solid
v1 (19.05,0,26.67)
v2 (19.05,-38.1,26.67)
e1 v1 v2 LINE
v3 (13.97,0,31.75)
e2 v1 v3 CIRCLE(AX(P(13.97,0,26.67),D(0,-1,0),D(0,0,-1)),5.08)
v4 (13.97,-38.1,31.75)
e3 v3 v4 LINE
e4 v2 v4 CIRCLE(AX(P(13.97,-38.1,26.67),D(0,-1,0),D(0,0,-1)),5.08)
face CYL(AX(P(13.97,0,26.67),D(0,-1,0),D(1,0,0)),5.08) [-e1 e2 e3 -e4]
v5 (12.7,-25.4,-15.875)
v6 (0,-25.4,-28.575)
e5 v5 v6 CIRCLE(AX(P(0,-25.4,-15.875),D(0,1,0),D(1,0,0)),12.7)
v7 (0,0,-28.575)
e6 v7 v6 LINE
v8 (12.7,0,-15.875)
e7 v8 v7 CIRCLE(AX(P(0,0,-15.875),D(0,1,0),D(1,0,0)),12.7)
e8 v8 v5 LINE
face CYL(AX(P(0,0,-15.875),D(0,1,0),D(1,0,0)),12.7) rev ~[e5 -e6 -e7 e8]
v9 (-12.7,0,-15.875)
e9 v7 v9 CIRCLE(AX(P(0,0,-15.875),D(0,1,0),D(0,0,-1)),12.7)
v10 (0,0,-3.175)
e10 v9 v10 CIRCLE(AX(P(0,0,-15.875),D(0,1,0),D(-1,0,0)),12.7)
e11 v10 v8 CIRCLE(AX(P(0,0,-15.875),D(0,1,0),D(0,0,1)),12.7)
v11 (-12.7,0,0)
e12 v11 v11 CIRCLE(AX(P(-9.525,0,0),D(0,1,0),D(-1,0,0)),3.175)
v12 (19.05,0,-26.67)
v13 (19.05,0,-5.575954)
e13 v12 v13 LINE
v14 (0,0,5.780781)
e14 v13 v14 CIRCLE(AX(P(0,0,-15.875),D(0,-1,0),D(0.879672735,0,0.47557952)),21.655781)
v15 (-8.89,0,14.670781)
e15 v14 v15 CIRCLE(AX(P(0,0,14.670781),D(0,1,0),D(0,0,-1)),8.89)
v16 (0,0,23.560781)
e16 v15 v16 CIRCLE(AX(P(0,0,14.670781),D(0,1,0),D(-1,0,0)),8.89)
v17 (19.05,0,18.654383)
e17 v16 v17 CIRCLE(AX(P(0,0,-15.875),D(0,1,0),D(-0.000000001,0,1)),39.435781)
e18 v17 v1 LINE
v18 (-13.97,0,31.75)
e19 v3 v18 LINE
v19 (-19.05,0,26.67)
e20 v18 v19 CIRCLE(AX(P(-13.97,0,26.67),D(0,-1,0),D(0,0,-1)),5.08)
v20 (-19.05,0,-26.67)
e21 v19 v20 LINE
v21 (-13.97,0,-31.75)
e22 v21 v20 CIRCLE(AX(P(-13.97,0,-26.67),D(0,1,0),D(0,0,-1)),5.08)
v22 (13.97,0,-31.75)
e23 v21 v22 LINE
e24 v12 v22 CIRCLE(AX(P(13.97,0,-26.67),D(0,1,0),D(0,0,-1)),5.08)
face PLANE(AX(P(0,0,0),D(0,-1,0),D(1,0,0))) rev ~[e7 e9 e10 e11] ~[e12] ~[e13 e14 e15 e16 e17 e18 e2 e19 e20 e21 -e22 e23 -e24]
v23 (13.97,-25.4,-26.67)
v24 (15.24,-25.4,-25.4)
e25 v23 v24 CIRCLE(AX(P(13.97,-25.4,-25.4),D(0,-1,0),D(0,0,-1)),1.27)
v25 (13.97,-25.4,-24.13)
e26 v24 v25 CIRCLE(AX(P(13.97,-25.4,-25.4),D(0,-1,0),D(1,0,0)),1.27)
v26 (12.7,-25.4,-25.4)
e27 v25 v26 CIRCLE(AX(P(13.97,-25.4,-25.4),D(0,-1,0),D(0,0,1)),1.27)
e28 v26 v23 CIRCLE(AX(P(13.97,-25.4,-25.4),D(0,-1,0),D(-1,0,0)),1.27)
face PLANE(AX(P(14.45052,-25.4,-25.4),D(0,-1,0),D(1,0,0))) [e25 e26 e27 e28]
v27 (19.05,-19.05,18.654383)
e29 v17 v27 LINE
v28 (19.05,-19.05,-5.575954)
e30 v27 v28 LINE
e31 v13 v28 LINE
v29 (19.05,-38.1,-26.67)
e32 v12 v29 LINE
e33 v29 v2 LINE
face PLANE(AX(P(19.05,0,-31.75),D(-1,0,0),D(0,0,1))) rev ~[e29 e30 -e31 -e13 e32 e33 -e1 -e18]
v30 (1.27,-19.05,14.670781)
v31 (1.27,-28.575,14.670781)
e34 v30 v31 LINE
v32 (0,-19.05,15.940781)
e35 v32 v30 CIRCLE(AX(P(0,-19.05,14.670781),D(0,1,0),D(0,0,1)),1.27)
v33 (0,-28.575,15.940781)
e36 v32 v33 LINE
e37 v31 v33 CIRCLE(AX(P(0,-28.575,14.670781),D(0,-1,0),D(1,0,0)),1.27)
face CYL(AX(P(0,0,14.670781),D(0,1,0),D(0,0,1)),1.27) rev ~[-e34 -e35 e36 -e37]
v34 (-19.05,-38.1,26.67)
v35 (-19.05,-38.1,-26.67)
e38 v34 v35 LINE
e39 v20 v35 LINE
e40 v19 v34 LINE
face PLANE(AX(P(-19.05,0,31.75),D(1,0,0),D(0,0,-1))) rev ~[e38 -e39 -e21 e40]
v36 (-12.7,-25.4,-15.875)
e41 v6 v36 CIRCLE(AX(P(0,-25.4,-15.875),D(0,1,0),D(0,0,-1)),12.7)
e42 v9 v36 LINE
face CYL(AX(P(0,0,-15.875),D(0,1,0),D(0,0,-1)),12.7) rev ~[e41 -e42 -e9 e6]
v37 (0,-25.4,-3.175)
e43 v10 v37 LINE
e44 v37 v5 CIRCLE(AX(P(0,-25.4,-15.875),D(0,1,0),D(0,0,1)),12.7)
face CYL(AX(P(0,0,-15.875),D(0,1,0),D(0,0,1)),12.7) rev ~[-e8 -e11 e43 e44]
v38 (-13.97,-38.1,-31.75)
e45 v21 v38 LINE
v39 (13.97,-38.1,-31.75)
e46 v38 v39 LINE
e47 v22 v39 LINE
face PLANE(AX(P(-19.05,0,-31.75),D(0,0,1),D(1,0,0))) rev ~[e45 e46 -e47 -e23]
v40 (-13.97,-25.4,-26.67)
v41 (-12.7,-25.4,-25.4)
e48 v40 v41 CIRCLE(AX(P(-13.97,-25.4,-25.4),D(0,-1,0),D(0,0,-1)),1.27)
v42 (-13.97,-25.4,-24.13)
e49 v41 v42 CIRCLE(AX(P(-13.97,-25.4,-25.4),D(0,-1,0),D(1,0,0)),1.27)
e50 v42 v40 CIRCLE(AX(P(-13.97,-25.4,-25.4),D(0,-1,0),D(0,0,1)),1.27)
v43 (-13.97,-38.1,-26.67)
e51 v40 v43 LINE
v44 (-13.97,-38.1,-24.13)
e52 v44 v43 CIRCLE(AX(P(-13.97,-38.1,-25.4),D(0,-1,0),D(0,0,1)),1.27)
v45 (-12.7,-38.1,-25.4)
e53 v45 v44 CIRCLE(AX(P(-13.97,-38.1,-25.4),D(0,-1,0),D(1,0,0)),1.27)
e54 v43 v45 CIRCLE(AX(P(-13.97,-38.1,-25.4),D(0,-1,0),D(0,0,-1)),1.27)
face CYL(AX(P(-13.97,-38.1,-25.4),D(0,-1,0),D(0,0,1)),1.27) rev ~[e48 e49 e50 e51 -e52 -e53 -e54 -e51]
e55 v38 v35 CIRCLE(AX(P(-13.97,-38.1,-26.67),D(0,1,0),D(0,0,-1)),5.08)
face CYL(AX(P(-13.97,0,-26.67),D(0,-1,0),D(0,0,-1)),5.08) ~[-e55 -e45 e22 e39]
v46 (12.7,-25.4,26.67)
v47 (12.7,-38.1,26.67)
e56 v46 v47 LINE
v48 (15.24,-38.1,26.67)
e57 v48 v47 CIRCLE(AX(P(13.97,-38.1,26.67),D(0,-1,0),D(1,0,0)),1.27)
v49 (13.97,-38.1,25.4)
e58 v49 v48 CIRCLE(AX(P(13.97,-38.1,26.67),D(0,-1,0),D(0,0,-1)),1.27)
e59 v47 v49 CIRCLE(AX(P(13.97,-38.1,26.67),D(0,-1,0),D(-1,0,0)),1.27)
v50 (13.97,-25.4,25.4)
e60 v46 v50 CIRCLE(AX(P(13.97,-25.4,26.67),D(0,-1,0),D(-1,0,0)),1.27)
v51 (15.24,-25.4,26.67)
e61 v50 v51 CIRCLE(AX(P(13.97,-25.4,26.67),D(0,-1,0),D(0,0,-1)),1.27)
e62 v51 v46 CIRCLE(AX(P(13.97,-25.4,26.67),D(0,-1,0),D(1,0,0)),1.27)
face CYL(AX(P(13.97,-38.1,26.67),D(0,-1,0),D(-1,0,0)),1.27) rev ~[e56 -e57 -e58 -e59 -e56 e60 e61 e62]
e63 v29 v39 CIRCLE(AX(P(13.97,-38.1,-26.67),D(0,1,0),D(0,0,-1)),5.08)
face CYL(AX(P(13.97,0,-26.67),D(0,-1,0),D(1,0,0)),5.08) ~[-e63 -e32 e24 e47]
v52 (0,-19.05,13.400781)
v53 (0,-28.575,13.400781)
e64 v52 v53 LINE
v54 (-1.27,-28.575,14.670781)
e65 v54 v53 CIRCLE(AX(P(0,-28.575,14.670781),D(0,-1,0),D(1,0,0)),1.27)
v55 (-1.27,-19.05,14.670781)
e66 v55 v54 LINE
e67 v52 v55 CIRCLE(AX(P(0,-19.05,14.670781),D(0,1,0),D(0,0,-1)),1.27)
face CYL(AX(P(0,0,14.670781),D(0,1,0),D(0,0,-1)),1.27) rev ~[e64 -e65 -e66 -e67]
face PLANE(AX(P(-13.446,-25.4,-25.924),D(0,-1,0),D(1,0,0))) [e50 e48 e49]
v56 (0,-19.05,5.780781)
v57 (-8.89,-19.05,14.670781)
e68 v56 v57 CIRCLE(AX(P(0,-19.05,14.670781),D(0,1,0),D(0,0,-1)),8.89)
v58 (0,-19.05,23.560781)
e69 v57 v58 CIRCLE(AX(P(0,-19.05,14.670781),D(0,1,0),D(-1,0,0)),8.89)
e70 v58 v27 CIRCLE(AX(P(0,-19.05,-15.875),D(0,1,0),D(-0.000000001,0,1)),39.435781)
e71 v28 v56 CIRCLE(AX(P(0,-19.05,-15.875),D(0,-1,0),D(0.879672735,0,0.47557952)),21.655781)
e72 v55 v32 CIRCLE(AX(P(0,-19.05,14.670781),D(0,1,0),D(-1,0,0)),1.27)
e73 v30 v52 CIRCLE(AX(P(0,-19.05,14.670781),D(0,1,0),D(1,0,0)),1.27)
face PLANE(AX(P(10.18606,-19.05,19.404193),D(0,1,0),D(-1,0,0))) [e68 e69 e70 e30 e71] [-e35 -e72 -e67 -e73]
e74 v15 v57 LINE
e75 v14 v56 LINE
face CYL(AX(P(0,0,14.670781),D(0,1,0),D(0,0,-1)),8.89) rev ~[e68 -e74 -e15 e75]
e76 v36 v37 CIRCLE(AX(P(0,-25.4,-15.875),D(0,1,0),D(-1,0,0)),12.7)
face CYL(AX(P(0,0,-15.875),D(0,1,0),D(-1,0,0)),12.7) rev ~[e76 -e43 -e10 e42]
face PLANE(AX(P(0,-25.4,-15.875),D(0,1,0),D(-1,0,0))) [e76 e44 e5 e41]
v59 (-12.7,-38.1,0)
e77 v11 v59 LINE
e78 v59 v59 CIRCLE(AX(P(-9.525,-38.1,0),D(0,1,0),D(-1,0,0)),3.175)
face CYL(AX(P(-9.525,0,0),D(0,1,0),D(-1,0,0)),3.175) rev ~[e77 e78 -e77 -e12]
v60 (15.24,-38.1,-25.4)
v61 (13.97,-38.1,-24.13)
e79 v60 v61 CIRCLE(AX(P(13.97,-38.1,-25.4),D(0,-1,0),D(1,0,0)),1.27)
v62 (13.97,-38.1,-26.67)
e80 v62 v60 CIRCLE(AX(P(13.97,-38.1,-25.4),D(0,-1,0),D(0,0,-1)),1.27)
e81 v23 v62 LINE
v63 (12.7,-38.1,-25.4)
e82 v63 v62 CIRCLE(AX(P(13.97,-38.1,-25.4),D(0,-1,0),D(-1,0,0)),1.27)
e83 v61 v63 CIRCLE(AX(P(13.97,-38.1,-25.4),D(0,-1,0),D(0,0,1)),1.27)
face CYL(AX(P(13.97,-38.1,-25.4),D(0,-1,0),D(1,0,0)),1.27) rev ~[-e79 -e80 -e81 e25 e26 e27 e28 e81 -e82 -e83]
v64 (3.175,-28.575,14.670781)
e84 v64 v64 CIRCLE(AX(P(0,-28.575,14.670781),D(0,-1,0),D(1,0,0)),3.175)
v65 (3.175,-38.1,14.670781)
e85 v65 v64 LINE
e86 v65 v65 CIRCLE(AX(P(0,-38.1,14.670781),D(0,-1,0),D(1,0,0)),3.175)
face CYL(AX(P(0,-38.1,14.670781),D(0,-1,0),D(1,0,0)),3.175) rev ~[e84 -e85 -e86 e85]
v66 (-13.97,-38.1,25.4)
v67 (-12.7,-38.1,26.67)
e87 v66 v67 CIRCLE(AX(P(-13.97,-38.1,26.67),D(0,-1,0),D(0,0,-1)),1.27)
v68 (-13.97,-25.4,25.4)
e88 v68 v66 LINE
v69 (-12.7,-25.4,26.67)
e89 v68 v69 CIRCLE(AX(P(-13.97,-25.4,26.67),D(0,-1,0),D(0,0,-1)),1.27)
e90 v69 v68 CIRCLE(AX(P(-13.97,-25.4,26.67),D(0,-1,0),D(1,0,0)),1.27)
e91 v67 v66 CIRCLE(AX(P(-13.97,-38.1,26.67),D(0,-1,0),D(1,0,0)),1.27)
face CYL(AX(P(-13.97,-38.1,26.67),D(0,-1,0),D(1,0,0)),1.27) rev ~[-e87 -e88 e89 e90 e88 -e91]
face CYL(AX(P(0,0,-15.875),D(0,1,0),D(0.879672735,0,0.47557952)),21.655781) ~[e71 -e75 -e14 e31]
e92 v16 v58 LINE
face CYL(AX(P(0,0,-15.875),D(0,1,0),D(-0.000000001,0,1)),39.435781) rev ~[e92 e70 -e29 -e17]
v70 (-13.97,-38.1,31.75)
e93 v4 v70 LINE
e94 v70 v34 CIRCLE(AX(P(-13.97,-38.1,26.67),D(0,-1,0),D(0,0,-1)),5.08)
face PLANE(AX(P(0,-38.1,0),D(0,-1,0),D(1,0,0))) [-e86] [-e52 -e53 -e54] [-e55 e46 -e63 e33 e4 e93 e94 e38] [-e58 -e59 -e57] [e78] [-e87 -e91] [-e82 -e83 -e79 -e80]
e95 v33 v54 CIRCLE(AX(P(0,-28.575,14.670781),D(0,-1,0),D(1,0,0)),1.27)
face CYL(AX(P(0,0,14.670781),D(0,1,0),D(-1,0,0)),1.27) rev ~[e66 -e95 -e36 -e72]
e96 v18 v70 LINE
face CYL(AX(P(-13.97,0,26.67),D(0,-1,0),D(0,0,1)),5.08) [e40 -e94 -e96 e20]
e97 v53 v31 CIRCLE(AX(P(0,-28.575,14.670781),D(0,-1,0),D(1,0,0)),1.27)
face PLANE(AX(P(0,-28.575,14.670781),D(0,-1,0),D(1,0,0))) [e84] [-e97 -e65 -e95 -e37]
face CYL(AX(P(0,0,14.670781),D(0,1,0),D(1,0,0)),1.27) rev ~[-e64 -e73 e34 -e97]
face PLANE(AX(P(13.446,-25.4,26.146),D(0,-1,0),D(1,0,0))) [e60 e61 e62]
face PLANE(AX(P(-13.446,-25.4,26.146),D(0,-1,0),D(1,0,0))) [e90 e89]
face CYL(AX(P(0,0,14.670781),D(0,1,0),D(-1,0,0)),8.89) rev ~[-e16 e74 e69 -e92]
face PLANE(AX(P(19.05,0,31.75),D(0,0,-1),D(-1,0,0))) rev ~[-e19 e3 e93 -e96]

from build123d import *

# Parameters (mm, degrees)
F1_DEPTH = 38.1
F3_DEPTH = 19.05
F4_DEPTH = 38.1
F5_DEPTH = 25.4
F6_R     = 5.08
F7_R     = 3.175
F7_R_2   = 1.27
F8_DEPTH = 9.525
F9_DEPTH = 12.7
F10_R    = 5.08


# Not quite as in the source:
# - a feature names something its author has since deleted; it is built from what else it names


with BuildPart() as f1:
    # F0 (on Front) → F1 (new body)
    with BuildSketch(Plane.XZ):
        Polygon((19.05, -31.75), (19.05, 31.75), (-19.05, 31.75), (-19.05, 0), (-19.05, -31.75), align=None)
        with BuildLine():
            ThreePointArc((-6.35, 0), (-9.525, -3.175), (-12.7, 0))
            ThreePointArc((-12.7, 0), (-9.525, 3.175), (-6.35, 0))
        make_face(mode=Mode.SUBTRACT)
    extrude(amount=F1_DEPTH)

    # F2 (on face) → F3 (cut)
    with BuildSketch(Plane(origin=(0, 0, 0), x_dir=(-1, 0, 0), z_dir=(0, 1, 0))):
        with BuildLine():
            ThreePointArc((-8.89, 14.6707808959), (-6.2861792775, 20.956960188), (2.06e-08, 23.5607808959))
            ThreePointArc((2.06e-08, 23.5607808959), (-9.8358430758, 22.3144881592), (-19.05, 18.654383355))
            Line((-19.05, 18.654383355), (-19.05, 14.6707808959))
            Line((-19.05, 14.6707808959), (-8.89, 14.6707808959))
        make_face()
        with BuildLine():
            ThreePointArc((1.27, 14.6707808959), (0.8980256121, 15.5688065081), (0, 15.9407808959))
            Line((0, 15.9407808959), (0, 14.6707808959))
            Line((0, 14.6707808959), (1.27, 14.6707808959))
        make_face()
        with BuildLine():
            ThreePointArc((0, 13.4007808959), (0.8980256121, 13.7727552838), (1.27, 14.6707808959))
            Line((1.27, 14.6707808959), (0, 14.6707808959))
            Line((0, 14.6707808959), (0, 13.4007808959))
        make_face()
        with BuildLine():
            Line((0, 14.6707808959), (0, 15.9407808959))
            ThreePointArc((0, 15.9407808959), (-0.8980256121, 15.5688065081), (-1.27, 14.6707808959))
            Line((-1.27, 14.6707808959), (0, 14.6707808959))
        make_face()
        with BuildLine():
            Line((0, 14.6707808959), (-1.27, 14.6707808959))
            ThreePointArc((-1.27, 14.6707808959), (-0.8980256121, 13.7727552838), (0, 13.4007808959))
            Line((0, 13.4007808959), (0, 14.6707808959))
        make_face()
        with BuildLine():
            ThreePointArc((-1.6e-09, 5.7807808959), (-6.2861792853, 8.3846016118), (-8.89, 14.6707808959))
            Line((-8.89, 14.6707808959), (-19.05, 14.6707808959))
            Line((-19.05, 14.6707808959), (-19.05, -5.5759541115))
            ThreePointArc((-19.05, -5.5759541115), (-11.0891605869, 2.7261656541), (-1.6e-09, 5.7807808959))
        make_face()
        with BuildLine():
            Line((-1.27, 14.6707808959), (-8.89, 14.6707808959))
            ThreePointArc((-8.89, 14.6707808959), (-6.2861792853, 8.3846016118), (-1.6e-09, 5.7807808959))
            Line((0, 5.7807808959), (0, 6.7332808959))
            Line((0, 6.7332808959), (0, 13.4007808959))
            ThreePointArc((0, 13.4007808959), (-0.8980256121, 13.7727552838), (-1.27, 14.6707808959))
        make_face()
        with BuildLine():
            ThreePointArc((-1.6e-09, 5.7807808959), (6.2861792842, 8.3846016106), (8.89, 14.6707808959))
            Line((8.89, 14.6707808959), (1.27, 14.6707808959))
            ThreePointArc((1.27, 14.6707808959), (0.8980256121, 13.7727552838), (0, 13.4007808959))
            Line((0, 13.4007808959), (0, 6.7332808959))
            Line((0, 6.7332808959), (0, 5.7807808959))
        make_face()
        with BuildLine():
            ThreePointArc((8.89, 14.6707808959), (6.286179292, 20.9569601734), (2.06e-08, 23.5607808959))
            Line((0, 23.5607808959), (0, 22.6082808959))
            Line((0, 22.6082808959), (0, 15.9407808959))
            ThreePointArc((0, 15.9407808959), (0.8980256121, 15.5688065081), (1.27, 14.6707808959))
            Line((1.27, 14.6707808959), (8.89, 14.6707808959))
        make_face()
        with BuildLine():
            Line((0, 22.6082808959), (0, 23.5607808959))
            ThreePointArc((2.06e-08, 23.5607808959), (-6.2861792775, 20.956960188), (-8.89, 14.6707808959))
            Line((-8.89, 14.6707808959), (-1.27, 14.6707808959))
            ThreePointArc((-1.27, 14.6707808959), (-0.8980256121, 15.5688065081), (0, 15.9407808959))
            Line((0, 15.9407808959), (0, 22.6082808959))
        make_face()
    extrude(amount=-F3_DEPTH, mode=Mode.SUBTRACT)

    # F2 (on face) → F4 (cut)
    with BuildSketch(Plane(origin=(0, 0, 0), x_dir=(-1, 0, 0), z_dir=(0, 1, 0))):
        with BuildLine():
            Line((0, 14.6707808959), (0, 15.9407808959))
            ThreePointArc((0, 15.9407808959), (-0.8980256121, 15.5688065081), (-1.27, 14.6707808959))
            Line((-1.27, 14.6707808959), (0, 14.6707808959))
        make_face()
        with BuildLine():
            ThreePointArc((1.27, 14.6707808959), (0.8980256121, 15.5688065081), (0, 15.9407808959))
            Line((0, 15.9407808959), (0, 14.6707808959))
            Line((0, 14.6707808959), (1.27, 14.6707808959))
        make_face()
        with BuildLine():
            ThreePointArc((0, 13.4007808959), (0.8980256121, 13.7727552838), (1.27, 14.6707808959))
            Line((1.27, 14.6707808959), (0, 14.6707808959))
            Line((0, 14.6707808959), (0, 13.4007808959))
        make_face()
        with BuildLine():
            Line((0, 14.6707808959), (-1.27, 14.6707808959))
            ThreePointArc((-1.27, 14.6707808959), (-0.8980256121, 13.7727552838), (0, 13.4007808959))
            Line((0, 13.4007808959), (0, 14.6707808959))
        make_face()
    extrude(amount=-F4_DEPTH, mode=Mode.SUBTRACT)

    # F2 (on face) → F5 (cut)
    with BuildSketch(Plane(origin=(0, 0, 0), x_dir=(-1, 0, 0), z_dir=(0, 1, 0))):
        with BuildLine():
            ThreePointArc((12.7, -15.875), (8.9802561211, -6.8947438789), (0, -3.175))
            ThreePointArc((0, -3.175), (-8.9802561211, -6.8947438789), (-12.7, -15.875))
            ThreePointArc((-12.7, -15.875), (-8.9802561211, -24.8552561211), (0, -28.575))
            ThreePointArc((0, -28.575), (8.9802561211, -24.8552561211), (12.7, -15.875))
        make_face()
    extrude(amount=-F5_DEPTH, mode=Mode.SUBTRACT)

    # F6
    f6_edges = [f1.edges().sort_by_distance(p)[0] for p in [
        (19.05, -19.05, 31.75),
        (-19.05, -19.05, 31.75),
    ]]
    fillet(f6_edges, radius=F6_R)

    # F7 (on face) → F8 (cut)
    with BuildSketch(Plane.XZ.offset(38.1)):
        with BuildLine():
            Line((-13.97, 25.4), (-13.97, 26.67))
            Line((-13.97, 26.67), (-12.7, 26.67))
            ThreePointArc((-12.7, 26.67), (-14.8680256121, 27.5680256121), (-13.97, 25.4))
        make_face()
        with BuildLine():
            Line((-12.7, 26.67), (-13.97, 26.67))
            Line((-13.97, 26.67), (-13.97, 25.4))
            ThreePointArc((-13.97, 25.4), (-13.0719743879, 25.7719743879), (-12.7, 26.67))
        make_face()
        with BuildLine():
            Line((13.97, 26.67), (12.7, 26.67))
            ThreePointArc((12.7, 26.67), (13.0719743879, 25.7719743879), (13.97, 25.4))
            Line((13.97, 25.4), (13.97, 26.67))
        make_face()
        with BuildLine():
            ThreePointArc((15.24, 26.67), (13.97, 27.94), (12.7, 26.67))
            Line((12.7, 26.67), (13.97, 26.67))
            Line((13.97, 26.67), (13.97, 25.4))
            ThreePointArc((13.97, 25.4), (14.8680256121, 25.7719743879), (15.24, 26.67))
        make_face()
        with BuildLine():
            Line((-13.97, -25.4), (-13.97, -24.13))
            ThreePointArc((-13.97, -24.13), (-15.24, -25.4), (-13.97, -26.67))
            Line((-13.97, -26.67), (-13.97, -25.4))
        make_face()
        with BuildLine():
            ThreePointArc((-12.7, -25.4), (-13.0719743879, -24.5019743879), (-13.97, -24.13))
            Line((-13.97, -24.13), (-13.97, -25.4))
            Line((-13.97, -25.4), (-12.7, -25.4))
        make_face()
        with BuildLine():
            ThreePointArc((15.24, -25.4), (14.8680256121, -24.5019743879), (13.97, -24.13))
            Line((13.97, -24.13), (13.97, -25.4))
            Line((13.97, -25.4), (13.97, -26.67))
            ThreePointArc((13.97, -26.67), (14.8680256121, -26.2980256121), (15.24, -25.4))
        make_face()
        with BuildLine():
            Line((13.97, -25.4), (13.97, -24.13))
            ThreePointArc((13.97, -24.13), (13.0719743879, -24.5019743879), (12.7, -25.4))
            Line((12.7, -25.4), (13.97, -25.4))
        make_face()
        with BuildLine():
            Line((13.97, -25.4), (12.7, -25.4))
            ThreePointArc((12.7, -25.4), (13.0719743879, -26.2980256121), (13.97, -26.67))
            Line((13.97, -26.67), (13.97, -25.4))
        make_face()
        with BuildLine():
            Line((-12.7, -25.4), (-13.97, -25.4))
            Line((-13.97, -25.4), (-13.97, -26.67))
            ThreePointArc((-13.97, -26.67), (-13.0719743879, -26.2980256121), (-12.7, -25.4))
        make_face()
        with Locations((0, 14.6707808959)):
            Circle(F7_R)
        with Locations((0, 14.6707808959)):
            Circle(F7_R_2, mode=Mode.SUBTRACT)
    extrude(amount=-F8_DEPTH, mode=Mode.SUBTRACT)

    # F7 (on face) → F9 (cut)
    with BuildSketch(Plane.XZ.offset(38.1)):
        with BuildLine():
            Line((-12.7, 26.67), (-13.97, 26.67))
            Line((-13.97, 26.67), (-13.97, 25.4))
            ThreePointArc((-13.97, 25.4), (-13.0719743879, 25.7719743879), (-12.7, 26.67))
        make_face()
        with BuildLine():
            Line((-13.97, 25.4), (-13.97, 26.67))
            Line((-13.97, 26.67), (-12.7, 26.67))
            ThreePointArc((-12.7, 26.67), (-14.8680256121, 27.5680256121), (-13.97, 25.4))
        make_face()
        with BuildLine():
            Line((13.97, 26.67), (12.7, 26.67))
            ThreePointArc((12.7, 26.67), (13.0719743879, 25.7719743879), (13.97, 25.4))
            Line((13.97, 25.4), (13.97, 26.67))
        make_face()
        with BuildLine():
            ThreePointArc((15.24, 26.67), (13.97, 27.94), (12.7, 26.67))
            Line((12.7, 26.67), (13.97, 26.67))
            Line((13.97, 26.67), (13.97, 25.4))
            ThreePointArc((13.97, 25.4), (14.8680256121, 25.7719743879), (15.24, 26.67))
        make_face()
        with BuildLine():
            ThreePointArc((15.24, -25.4), (14.8680256121, -24.5019743879), (13.97, -24.13))
            Line((13.97, -24.13), (13.97, -25.4))
            Line((13.97, -25.4), (13.97, -26.67))
            ThreePointArc((13.97, -26.67), (14.8680256121, -26.2980256121), (15.24, -25.4))
        make_face()
        with BuildLine():
            Line((13.97, -25.4), (13.97, -24.13))
            ThreePointArc((13.97, -24.13), (13.0719743879, -24.5019743879), (12.7, -25.4))
            Line((12.7, -25.4), (13.97, -25.4))
        make_face()
        with BuildLine():
            Line((13.97, -25.4), (12.7, -25.4))
            ThreePointArc((12.7, -25.4), (13.0719743879, -26.2980256121), (13.97, -26.67))
            Line((13.97, -26.67), (13.97, -25.4))
        make_face()
        with BuildLine():
            Line((-12.7, -25.4), (-13.97, -25.4))
            Line((-13.97, -25.4), (-13.97, -26.67))
            ThreePointArc((-13.97, -26.67), (-13.0719743879, -26.2980256121), (-12.7, -25.4))
        make_face()
        with BuildLine():
            ThreePointArc((-12.7, -25.4), (-13.0719743879, -24.5019743879), (-13.97, -24.13))
            Line((-13.97, -24.13), (-13.97, -25.4))
            Line((-13.97, -25.4), (-12.7, -25.4))
        make_face()
        with BuildLine():
            Line((-13.97, -25.4), (-13.97, -24.13))
            ThreePointArc((-13.97, -24.13), (-15.24, -25.4), (-13.97, -26.67))
            Line((-13.97, -26.67), (-13.97, -25.4))
        make_face()
    extrude(amount=-F9_DEPTH, mode=Mode.SUBTRACT)

    # F10
    f10_edges = [f1.edges().sort_by_distance(p)[0] for p in [
        (19.05, -19.05, -31.75),
        (-19.05, -19.05, -31.75),
    ]]
    fillet(f10_edges, radius=F10_R)


solid = f1.part
